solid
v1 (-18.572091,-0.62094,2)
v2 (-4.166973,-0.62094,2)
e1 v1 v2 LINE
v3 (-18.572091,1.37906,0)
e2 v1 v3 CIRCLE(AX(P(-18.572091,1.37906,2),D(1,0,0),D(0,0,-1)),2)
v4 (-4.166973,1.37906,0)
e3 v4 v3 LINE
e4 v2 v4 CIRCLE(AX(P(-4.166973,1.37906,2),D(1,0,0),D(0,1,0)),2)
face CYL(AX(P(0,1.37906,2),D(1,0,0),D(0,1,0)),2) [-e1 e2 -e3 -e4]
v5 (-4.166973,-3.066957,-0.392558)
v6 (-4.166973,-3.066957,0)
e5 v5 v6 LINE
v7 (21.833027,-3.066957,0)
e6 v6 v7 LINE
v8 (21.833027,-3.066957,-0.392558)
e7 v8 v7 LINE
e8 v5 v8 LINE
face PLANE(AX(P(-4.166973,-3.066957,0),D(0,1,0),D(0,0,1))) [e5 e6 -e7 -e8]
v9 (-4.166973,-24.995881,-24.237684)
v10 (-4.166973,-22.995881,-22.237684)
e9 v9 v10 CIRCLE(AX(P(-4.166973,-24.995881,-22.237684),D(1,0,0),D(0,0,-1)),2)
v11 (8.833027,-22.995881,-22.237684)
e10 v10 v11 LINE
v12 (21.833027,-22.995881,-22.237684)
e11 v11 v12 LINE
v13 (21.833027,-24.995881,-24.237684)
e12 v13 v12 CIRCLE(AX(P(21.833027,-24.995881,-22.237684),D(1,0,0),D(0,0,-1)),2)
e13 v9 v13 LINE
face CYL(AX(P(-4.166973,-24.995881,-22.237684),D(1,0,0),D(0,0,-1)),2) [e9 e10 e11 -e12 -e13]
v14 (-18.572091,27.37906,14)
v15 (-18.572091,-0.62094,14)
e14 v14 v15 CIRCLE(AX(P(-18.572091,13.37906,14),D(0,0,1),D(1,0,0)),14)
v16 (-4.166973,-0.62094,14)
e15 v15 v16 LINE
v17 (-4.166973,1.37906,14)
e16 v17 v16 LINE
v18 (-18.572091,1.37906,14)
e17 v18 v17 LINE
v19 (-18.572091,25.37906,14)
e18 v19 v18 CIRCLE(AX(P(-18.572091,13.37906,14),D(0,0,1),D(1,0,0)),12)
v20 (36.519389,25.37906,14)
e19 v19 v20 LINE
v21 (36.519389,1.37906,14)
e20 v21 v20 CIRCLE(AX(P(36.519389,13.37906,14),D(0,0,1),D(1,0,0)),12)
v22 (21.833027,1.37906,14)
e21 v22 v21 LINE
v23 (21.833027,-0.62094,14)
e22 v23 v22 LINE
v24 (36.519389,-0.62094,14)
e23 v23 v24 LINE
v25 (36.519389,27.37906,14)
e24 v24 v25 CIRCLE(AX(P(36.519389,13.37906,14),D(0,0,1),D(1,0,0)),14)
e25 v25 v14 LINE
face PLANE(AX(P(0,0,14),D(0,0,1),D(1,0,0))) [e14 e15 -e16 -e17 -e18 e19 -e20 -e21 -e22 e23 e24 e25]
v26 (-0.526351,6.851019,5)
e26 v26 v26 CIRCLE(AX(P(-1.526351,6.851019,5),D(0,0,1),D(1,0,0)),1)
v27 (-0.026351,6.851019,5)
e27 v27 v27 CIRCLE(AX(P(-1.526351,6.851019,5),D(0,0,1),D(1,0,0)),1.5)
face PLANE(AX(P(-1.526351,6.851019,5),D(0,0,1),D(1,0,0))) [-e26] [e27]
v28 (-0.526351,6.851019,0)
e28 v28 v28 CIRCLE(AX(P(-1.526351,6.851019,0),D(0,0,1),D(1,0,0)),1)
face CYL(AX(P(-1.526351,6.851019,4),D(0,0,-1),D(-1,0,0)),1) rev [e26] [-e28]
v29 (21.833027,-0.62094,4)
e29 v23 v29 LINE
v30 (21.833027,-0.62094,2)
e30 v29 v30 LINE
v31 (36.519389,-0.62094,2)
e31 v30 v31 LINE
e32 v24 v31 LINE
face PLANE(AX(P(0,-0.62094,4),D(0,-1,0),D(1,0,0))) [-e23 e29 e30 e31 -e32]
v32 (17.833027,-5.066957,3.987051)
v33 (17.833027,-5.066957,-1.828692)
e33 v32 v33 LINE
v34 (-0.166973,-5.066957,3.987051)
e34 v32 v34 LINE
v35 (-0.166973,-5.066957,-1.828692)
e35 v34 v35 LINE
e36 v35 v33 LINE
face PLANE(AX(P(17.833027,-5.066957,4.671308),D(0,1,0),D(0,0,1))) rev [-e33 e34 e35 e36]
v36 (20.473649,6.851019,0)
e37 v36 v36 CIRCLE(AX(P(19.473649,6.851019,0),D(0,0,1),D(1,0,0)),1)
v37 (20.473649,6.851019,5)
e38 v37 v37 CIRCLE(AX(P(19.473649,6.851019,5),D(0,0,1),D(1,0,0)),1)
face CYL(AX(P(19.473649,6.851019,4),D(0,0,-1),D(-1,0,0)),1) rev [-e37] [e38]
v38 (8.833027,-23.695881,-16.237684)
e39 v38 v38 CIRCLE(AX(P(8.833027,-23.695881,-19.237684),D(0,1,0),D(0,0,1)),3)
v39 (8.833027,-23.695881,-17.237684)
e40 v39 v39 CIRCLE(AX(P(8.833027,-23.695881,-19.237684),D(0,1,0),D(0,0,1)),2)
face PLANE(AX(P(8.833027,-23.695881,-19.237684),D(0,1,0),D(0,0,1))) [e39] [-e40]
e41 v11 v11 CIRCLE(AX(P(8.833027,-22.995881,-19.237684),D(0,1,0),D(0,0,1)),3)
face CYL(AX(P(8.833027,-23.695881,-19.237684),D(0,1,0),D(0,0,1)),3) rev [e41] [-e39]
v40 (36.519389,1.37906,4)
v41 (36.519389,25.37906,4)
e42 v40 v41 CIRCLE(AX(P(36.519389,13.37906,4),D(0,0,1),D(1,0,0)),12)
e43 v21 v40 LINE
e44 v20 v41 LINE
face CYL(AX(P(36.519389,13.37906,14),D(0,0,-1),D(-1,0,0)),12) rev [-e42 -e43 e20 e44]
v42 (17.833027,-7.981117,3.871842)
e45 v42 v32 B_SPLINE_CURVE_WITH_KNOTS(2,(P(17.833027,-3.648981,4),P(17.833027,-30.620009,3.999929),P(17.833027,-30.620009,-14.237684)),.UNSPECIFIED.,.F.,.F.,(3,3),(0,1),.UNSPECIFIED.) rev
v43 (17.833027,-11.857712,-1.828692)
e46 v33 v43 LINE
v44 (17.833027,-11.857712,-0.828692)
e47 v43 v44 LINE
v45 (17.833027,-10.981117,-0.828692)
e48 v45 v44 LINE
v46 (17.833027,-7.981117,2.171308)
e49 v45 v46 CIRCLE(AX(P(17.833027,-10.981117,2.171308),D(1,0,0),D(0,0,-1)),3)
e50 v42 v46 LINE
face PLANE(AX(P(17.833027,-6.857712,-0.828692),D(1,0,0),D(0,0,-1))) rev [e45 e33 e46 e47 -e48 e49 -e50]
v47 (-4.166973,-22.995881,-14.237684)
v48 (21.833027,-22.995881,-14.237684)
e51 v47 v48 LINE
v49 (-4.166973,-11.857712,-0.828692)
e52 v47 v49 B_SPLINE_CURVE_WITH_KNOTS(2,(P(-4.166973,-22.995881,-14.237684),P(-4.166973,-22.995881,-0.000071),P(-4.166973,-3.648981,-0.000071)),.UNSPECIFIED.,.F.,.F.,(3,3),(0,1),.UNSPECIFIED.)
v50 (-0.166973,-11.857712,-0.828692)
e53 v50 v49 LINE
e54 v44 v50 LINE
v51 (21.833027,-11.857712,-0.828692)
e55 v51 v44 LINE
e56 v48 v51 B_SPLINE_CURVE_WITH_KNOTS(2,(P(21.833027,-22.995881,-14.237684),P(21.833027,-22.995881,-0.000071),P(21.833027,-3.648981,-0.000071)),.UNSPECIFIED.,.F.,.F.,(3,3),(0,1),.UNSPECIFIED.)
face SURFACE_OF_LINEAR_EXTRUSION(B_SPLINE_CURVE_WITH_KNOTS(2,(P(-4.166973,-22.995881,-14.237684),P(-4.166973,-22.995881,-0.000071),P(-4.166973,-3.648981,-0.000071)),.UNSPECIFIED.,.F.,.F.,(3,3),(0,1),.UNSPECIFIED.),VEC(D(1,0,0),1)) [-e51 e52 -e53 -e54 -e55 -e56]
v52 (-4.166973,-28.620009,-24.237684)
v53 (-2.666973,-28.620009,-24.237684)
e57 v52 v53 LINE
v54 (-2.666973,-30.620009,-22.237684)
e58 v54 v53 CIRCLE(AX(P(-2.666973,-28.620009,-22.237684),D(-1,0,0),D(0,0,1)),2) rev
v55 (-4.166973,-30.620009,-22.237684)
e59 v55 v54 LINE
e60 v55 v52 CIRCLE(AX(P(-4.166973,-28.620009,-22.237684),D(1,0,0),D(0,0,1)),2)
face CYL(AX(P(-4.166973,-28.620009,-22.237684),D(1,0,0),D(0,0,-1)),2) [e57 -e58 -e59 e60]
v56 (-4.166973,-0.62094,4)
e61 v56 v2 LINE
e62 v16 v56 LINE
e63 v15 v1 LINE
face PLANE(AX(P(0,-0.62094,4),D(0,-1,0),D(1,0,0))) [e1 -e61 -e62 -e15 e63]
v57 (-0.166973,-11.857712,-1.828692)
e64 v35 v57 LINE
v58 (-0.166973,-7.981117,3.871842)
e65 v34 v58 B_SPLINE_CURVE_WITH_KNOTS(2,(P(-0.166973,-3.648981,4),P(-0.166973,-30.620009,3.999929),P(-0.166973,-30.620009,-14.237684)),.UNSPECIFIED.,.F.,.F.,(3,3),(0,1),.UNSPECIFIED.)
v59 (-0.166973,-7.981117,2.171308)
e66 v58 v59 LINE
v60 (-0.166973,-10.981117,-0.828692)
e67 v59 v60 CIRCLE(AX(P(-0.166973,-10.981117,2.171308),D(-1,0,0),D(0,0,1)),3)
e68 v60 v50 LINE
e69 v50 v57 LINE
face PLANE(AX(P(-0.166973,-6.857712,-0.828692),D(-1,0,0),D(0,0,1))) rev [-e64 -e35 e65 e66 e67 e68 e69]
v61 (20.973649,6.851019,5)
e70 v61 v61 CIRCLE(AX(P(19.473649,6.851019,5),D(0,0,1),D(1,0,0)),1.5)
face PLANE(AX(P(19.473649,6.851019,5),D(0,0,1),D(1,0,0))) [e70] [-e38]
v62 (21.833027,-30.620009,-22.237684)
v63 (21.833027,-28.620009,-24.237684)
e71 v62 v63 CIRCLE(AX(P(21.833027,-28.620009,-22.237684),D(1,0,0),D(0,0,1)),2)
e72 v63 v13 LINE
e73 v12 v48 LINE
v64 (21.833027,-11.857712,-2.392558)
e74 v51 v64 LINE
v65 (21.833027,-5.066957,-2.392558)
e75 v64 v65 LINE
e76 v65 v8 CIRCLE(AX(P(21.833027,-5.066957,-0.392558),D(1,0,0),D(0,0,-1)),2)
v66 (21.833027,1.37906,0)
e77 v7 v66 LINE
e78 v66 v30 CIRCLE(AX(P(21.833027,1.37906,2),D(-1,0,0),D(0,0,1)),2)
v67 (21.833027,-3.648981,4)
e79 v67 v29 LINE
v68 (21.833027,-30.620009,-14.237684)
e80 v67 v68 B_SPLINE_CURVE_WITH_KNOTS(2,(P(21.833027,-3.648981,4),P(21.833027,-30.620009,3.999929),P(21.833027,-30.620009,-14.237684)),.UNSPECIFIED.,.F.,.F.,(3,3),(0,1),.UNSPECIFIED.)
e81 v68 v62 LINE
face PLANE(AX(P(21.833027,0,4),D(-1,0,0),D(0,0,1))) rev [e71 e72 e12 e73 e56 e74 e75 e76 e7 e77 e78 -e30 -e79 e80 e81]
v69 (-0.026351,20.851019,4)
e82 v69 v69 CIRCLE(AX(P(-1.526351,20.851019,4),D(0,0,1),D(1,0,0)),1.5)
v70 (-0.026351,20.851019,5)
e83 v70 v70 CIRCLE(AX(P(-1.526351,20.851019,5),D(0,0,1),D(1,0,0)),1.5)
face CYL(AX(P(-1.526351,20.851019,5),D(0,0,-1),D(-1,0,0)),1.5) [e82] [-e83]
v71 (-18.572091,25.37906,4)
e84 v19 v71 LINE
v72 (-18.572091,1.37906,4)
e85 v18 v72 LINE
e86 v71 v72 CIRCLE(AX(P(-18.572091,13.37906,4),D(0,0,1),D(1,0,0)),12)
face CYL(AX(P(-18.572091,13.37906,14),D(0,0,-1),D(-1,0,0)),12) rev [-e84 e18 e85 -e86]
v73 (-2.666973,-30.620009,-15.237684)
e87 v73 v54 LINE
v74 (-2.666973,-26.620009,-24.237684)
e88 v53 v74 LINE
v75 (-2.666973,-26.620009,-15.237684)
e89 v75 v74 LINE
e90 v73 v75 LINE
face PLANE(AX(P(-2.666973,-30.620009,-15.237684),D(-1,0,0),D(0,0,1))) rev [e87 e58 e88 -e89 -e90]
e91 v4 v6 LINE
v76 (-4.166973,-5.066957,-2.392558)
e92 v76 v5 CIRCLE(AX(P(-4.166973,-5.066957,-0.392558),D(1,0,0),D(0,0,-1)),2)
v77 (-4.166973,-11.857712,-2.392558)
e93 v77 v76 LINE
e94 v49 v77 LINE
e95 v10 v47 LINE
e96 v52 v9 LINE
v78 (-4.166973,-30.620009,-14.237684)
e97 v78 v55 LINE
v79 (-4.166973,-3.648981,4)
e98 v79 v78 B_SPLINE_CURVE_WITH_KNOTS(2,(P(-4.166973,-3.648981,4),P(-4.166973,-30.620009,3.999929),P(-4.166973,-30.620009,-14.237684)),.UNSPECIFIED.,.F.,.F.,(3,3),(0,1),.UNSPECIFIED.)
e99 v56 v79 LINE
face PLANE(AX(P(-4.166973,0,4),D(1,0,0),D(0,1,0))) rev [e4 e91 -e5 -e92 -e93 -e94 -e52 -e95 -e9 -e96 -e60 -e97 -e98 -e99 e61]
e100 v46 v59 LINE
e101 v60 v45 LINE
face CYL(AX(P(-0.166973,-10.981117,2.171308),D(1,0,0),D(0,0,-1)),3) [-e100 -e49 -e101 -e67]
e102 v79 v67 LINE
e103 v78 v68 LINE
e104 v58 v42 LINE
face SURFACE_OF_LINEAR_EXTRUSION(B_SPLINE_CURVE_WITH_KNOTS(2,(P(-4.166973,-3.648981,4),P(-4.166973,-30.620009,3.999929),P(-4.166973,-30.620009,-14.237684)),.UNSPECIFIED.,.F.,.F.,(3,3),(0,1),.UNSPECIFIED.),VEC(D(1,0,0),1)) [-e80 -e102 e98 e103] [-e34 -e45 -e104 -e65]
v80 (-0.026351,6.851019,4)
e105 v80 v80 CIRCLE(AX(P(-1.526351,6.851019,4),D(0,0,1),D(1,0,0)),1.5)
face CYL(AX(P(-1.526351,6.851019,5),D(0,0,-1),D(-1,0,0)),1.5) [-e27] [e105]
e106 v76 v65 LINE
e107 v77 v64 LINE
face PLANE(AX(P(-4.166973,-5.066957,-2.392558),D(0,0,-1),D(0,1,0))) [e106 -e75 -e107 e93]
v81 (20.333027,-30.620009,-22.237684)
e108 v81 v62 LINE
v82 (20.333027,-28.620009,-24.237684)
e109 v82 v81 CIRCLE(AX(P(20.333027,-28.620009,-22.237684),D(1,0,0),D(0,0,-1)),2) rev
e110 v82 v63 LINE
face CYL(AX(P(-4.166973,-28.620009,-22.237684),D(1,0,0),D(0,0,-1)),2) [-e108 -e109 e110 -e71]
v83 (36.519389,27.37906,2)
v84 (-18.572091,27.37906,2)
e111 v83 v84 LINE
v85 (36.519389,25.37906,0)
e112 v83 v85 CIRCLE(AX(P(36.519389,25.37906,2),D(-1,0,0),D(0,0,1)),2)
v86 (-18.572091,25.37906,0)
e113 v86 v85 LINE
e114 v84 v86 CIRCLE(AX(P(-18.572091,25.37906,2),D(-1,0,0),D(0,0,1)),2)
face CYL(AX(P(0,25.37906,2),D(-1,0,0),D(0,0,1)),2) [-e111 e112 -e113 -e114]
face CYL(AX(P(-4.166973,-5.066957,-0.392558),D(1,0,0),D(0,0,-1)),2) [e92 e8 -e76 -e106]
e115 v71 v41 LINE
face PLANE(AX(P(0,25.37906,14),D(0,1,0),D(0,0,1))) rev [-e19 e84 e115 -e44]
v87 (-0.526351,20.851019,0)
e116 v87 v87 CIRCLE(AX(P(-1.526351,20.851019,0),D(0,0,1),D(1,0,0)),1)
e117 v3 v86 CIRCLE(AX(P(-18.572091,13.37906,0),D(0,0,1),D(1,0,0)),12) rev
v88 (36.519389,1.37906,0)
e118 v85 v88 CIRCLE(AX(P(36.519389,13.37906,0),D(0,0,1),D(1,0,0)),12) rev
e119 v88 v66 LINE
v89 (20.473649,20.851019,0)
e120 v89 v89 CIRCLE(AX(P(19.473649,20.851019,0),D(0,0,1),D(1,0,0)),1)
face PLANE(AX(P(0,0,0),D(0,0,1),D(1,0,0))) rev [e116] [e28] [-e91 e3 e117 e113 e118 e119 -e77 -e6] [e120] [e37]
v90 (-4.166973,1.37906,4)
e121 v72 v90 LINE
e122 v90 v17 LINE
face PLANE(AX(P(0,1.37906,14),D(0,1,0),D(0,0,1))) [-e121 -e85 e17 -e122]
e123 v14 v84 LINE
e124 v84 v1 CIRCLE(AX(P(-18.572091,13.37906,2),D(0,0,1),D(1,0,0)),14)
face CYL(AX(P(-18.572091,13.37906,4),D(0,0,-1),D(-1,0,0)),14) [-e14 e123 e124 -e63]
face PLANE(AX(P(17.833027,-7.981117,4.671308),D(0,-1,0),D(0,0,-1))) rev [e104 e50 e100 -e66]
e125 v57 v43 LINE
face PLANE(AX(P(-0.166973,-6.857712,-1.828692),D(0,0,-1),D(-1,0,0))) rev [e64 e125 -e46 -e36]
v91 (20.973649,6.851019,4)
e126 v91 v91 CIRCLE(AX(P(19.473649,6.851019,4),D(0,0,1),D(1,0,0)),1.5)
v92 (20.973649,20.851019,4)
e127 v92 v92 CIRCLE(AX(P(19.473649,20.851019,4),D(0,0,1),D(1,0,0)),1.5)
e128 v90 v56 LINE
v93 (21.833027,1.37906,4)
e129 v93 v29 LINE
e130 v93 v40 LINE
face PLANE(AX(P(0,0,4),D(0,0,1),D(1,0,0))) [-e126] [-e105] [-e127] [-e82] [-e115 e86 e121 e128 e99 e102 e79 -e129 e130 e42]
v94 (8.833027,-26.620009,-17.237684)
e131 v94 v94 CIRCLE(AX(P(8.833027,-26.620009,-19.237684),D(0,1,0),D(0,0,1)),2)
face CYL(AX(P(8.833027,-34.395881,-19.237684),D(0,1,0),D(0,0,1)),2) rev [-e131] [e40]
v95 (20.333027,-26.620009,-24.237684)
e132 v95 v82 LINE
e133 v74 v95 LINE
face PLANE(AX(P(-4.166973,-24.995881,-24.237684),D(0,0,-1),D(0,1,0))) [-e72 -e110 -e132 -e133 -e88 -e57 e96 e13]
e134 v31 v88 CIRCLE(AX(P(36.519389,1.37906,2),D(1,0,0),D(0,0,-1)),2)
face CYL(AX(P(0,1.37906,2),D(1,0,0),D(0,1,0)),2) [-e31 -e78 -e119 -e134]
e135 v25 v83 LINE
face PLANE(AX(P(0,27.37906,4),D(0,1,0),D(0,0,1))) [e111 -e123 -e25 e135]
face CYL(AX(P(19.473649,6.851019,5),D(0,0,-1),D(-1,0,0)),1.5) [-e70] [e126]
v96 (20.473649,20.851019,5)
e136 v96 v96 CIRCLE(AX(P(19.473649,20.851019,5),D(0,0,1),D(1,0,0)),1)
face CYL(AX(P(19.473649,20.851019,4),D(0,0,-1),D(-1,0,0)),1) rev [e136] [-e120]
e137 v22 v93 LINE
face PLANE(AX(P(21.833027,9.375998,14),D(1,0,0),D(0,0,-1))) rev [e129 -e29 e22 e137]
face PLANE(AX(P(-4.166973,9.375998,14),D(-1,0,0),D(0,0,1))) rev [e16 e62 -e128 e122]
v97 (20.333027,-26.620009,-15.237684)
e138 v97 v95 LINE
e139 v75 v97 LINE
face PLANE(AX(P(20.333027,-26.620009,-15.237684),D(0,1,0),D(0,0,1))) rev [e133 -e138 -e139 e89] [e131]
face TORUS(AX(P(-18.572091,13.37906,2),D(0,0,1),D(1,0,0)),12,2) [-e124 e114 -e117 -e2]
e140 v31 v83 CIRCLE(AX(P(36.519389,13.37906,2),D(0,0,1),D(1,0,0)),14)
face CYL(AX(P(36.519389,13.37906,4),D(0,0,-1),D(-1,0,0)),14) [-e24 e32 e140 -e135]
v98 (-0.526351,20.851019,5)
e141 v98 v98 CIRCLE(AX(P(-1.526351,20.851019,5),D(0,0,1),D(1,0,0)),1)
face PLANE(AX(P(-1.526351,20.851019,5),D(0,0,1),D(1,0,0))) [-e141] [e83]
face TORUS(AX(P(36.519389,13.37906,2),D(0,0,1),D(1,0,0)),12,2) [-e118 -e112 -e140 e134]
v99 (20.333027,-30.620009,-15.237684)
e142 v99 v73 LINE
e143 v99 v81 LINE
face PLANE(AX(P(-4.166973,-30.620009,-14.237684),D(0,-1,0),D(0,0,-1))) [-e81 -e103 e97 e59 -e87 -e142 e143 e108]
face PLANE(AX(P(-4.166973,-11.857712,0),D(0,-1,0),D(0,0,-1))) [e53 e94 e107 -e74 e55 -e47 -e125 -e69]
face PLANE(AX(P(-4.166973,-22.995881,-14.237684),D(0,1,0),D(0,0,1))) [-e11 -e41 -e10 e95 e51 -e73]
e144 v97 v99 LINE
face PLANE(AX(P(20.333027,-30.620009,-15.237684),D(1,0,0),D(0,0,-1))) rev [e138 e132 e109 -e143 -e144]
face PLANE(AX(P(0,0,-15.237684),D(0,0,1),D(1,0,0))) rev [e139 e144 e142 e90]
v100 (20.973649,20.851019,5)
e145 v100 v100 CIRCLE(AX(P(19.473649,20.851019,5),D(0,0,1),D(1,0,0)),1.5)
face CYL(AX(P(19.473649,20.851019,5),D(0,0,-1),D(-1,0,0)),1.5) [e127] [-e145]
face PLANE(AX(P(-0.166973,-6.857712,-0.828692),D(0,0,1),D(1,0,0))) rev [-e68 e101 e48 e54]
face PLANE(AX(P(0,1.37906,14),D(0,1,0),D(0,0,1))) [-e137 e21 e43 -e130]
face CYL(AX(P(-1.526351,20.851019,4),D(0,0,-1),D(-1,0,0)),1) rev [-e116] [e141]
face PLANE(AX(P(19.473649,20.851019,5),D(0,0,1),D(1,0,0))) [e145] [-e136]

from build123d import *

# Parameters (mm, degrees)
SKETCH1_R                = 1
BOSS_EXTRUDE2_DEPTH      = 4
BOSS_EXTRUDE3_DEPTH      = 10
SKETCH3_W                = 26
SKETCH3_H                = 10
CUT_EXTRUDE1_DEPTH       = 10
BOSS_EXTRUDE4_DEPTH      = 26
SKETCH8_W                = 23
SKETCH8_H                = 4
CUT_EXTRUDE5_DEPTH       = 9
SKETCH10_R               = 3
CUT_EXTRUDE7_DEPTH       = 0.7
SKETCH11_R               = 2
CUT_EXTRUDE8_DEPTH       = 10.7
BOSS_EXTRUDE5_START      = -26
BOSS_EXTRUDE5_DEPTH      = 26
SKETCH14_W               = 18
SKETCH14_H               = 1
CUT_EXTRUDE10_DEPTH      = 5
CUT_EXTRUDE11_DEPTH      = 1
CUT_EXTRUDE11_DEPTH_BACK = 5.5
SKETCH15_W               = 18
SKETCH15_H               = 2.914160071
SKETCH16_R               = 1.5
SKETCH16_R_2             = 1
BOSS_EXTRUDE6_DEPTH      = 1
FILLET3_R                = 2
FILLET4_R                = 3


# Read off the part's stored shape, not the designer's step: Boss-Extrude5
with BuildPart() as part:
    # Sketch1 → Boss-Extrude2 (new body)
    with BuildSketch(Plane.XY):
        with BuildLine():
            Line((-18.57209146, 27.379059863), (36.519389128, 27.379059863))
            ThreePointArc((36.519389128, 27.379059863), (50.519389128, 13.379059863), (36.519389128, -0.620940137))
            Line((36.519389128, -0.620940137), (21.833027405, -0.620940137))
            Line((21.833027405, -0.620940137), (21.833027405, -3.648981121))
            Line((21.833027405, -3.648981121), (-4.166972595, -3.648981121))
            Line((-4.166972595, -3.648981121), (-4.166972595, -0.620940137))
            Line((-4.166972595, -0.620940137), (-18.57209146, -0.620940137))
            ThreePointArc((-18.57209146, -0.620940137), (-32.57209146, 13.379059863), (-18.57209146, 27.379059863))
        make_face()
        with Locations((-1.526351166, 20.851018883)):
            Circle(SKETCH1_R, mode=Mode.SUBTRACT)
        with Locations((19.473648834, 20.851018883)):
            Circle(SKETCH1_R, mode=Mode.SUBTRACT)
        with Locations((-1.526351166, 6.851018883)):
            Circle(SKETCH1_R, mode=Mode.SUBTRACT)
        with Locations((19.473648834, 6.851018883)):
            Circle(SKETCH1_R, mode=Mode.SUBTRACT)
    extrude(amount=BOSS_EXTRUDE2_DEPTH)

    # Sketch2 → Boss-Extrude3 (add)
    with BuildSketch(Plane.XY.offset(4)):
        with BuildLine():
            Line((-4.166972595, -0.620940137), (-4.166972595, -0.624002345))
            Line((-4.166972595, -0.624002345), (21.833027405, -0.624002345))
            Line((21.833027405, -0.624002345), (21.833027405, -0.620940137))
            Line((21.833027405, -0.620940137), (36.519389128, -0.620940137))
            ThreePointArc((36.519389128, -0.620940137), (50.519389128, 13.379059863), (36.519389128, 27.379059863))
            Line((36.519389128, 27.379059863), (-18.57209146, 27.379059863))
            ThreePointArc((-18.57209146, 27.379059863), (-32.57209146, 13.379059863), (-18.57209146, -0.620940137))
            Line((-18.57209146, -0.620940137), (-4.166972595, -0.620940137))
        make_face()
        with BuildLine():
            ThreePointArc((-18.57209146, 1.379059863), (-30.57209146, 13.379059863), (-18.57209146, 25.379059863))
            Line((-18.57209146, 25.379059863), (36.519389128, 25.379059863))
            ThreePointArc((36.519389128, 25.379059863), (48.519389128, 13.379059863), (36.519389128, 1.379059863))
            Line((36.519389128, 1.379059863), (-18.57209146, 1.379059863))
        make_face(mode=Mode.SUBTRACT)
    extrude(amount=BOSS_EXTRUDE3_DEPTH)

    # Sketch3 → Cut-Extrude1 (cut)
    with BuildSketch(Plane.XZ.offset(0.624002345)):
        with Locations((8.833027405, 9)):
            Rectangle(SKETCH3_W, SKETCH3_H)
    extrude(amount=-CUT_EXTRUDE1_DEPTH, mode=Mode.SUBTRACT)

    # Sketch4 → Boss-Extrude4 (add)
    with BuildSketch(Plane(origin=(21.833027405, 0, 0), x_dir=(0, 0, -1), z_dir=(1, 0, 0))):
        with BuildLine():
            Line((-4, -3.648981121), (7.0957e-05, -3.648981121))
            add(Edge.make_bspline(
                [(7.0957e-05, -3.648981121), (7.0957e-05, -22.995880537), (14.23768392, -22.995880537)],
                knots=[0, 0, 0, 1, 1, 1], degree=2))
            Line((14.23768392, -22.995880537), (22.23768392, -22.995880537))
            ThreePointArc((22.23768392, -22.995880537), (23.651897483, -23.581666974), (24.23768392, -24.995880537))
            Line((24.23768392, -24.995880537), (24.23768392, -28.620008298))
            ThreePointArc((24.23768392, -28.620008298), (23.651897483, -30.034221861), (22.23768392, -30.620008298))
            Line((22.23768392, -30.620008298), (14.23768392, -30.620008298))
            add(Edge.make_bspline(
                [(-4, -3.648981121), (-3.999929043, -30.620008298), (14.23768392, -30.620008298)],
                knots=[0, 0, 0, 1, 1, 1], degree=2))
        make_face()
    extrude(amount=-BOSS_EXTRUDE4_DEPTH)

    # Sketch8 → Cut-Extrude5 (cut)
    with BuildSketch(Plane(origin=(0, 0, -24.237684184), x_dir=(-1, 0, 0), z_dir=(0, 0, -1))):
        with Locations((-8.833027405, -28.620008644)):
            Rectangle(SKETCH8_W, SKETCH8_H)
    extrude(amount=-CUT_EXTRUDE5_DEPTH, mode=Mode.SUBTRACT)

    # Sketch10 → Cut-Extrude7 (cut)
    with BuildSketch(Plane(origin=(0, -22.995880711, 0), x_dir=(1, 0, 0), z_dir=(0, 1, 0))):
        with Locations(Location((8.833027405, 19.237684184, 0), (0, 0, 270))):
            Circle(SKETCH10_R)
    extrude(amount=-CUT_EXTRUDE7_DEPTH, mode=Mode.SUBTRACT)

    # Sketch11 → Cut-Extrude8 (cut)
    with BuildSketch(Plane(origin=(0, -23.695880711, 0), x_dir=(1, 0, 0), z_dir=(0, 1, 0))):
        with Locations(Location((8.833027405, 19.23768392, 0), (0, 0, 270))):
            Circle(SKETCH11_R)
    extrude(amount=-CUT_EXTRUDE8_DEPTH, mode=Mode.SUBTRACT)

    # Boss-Extrude5 outline → Boss-Extrude5 (add)
    with BuildSketch(Plane(origin=(21.833027405, 0, 0), x_dir=(0, 0, -1), z_dir=(1, 0, 0)).offset(BOSS_EXTRUDE5_START)):
        with BuildLine():
            ThreePointArc((2.392558217, -5.066956781), (1.80677178, -3.652743218), (0.392558217, -3.066956781))
            Line((0.392558217, -3.066956781), (-1, -3.066956781))
            Line((-1, -3.066956781), (-1, -3.648981121))
            Line((-1, -3.648981121), (7.0828e-05, -3.648981121))
            add(Edge.make_bspline(
                [(0.828692106, -11.857711885), (7.0827e-05, -8.316335967), (7.0828e-05, -3.648981121)],
                knots=[0.758754376, 0.758754376, 0.758754376, 1, 1, 1], degree=2))
            Line((0.828692106, -11.857711885), (2.392558217, -11.857711885))
            Line((2.392558217, -11.857711885), (2.392558217, -5.066956781))
        make_face()
    extrude(amount=BOSS_EXTRUDE5_DEPTH)

    # Sketch14 → Cut-Extrude10 (cut)
    with BuildSketch(Plane.XZ.offset(11.857711885)):
        with Locations((8.833027405, -1.328692104)):
            Rectangle(SKETCH14_W, SKETCH14_H)
    extrude(amount=-CUT_EXTRUDE10_DEPTH, mode=Mode.SUBTRACT)

    # Sketch15 → Cut-Extrude11 (cut, two sides: drawn at the far end of the back side and taken through both)
    with BuildSketch(Plane(origin=(0, 0, -0.828692104), x_dir=(-1, 0, 0), z_dir=(0, 0, -1)).offset(-CUT_EXTRUDE11_DEPTH_BACK)):
        with Locations((-8.833027405, -6.524036817)):
            Rectangle(SKETCH15_W, SKETCH15_H)
    extrude(amount=CUT_EXTRUDE11_DEPTH + CUT_EXTRUDE11_DEPTH_BACK, mode=Mode.SUBTRACT)

    # Sketch16 → Boss-Extrude6 (add)
    # profile 1 of 4: a face of its own
    with BuildSketch(Plane.XY.offset(4)):
        with Locations((-1.526351166, 20.851018883)):
            Circle(SKETCH16_R)
        with Locations((-1.526351166, 20.851018883)):
            Circle(SKETCH16_R_2, mode=Mode.SUBTRACT)
    # profile 2 of 4: a face of its own
    with BuildSketch(Plane.XY.offset(4)):
        with Locations((-1.526351166, 6.851018883)):
            Circle(SKETCH16_R)
        with Locations((-1.526351166, 6.851018883)):
            Circle(SKETCH16_R_2, mode=Mode.SUBTRACT)
    # profile 3 of 4: a face of its own
    with BuildSketch(Plane.XY.offset(4)):
        with Locations((19.473648834, 20.851018883)):
            Circle(SKETCH16_R)
        with Locations((19.473648834, 20.851018883)):
            Circle(SKETCH16_R_2, mode=Mode.SUBTRACT)
    # profile 4 of 4: a face of its own
    with BuildSketch(Plane.XY.offset(4)):
        with Locations((19.473648834, 6.851018883)):
            Circle(SKETCH16_R)
        with Locations((19.473648834, 6.851018883)):
            Circle(SKETCH16_R_2, mode=Mode.SUBTRACT)
    extrude(amount=BOSS_EXTRUDE6_DEPTH)

    # Fillet3
    fillet3_edges = [part.edges().sort_by_distance(p)[0] for p in [
        (50.519389128, 13.379059863, 0),
        (29.176208267, -0.620940137, 0),
        (-11.369532027, -0.620940137, 0),
        (-32.57209146, 13.379059863, 0),
        (8.973648834, 27.379059863, 0),
    ]]
    fillet(fillet3_edges, radius=FILLET3_R)

    # Fillet4
    fillet4_edges = [part.edges().sort_by_distance(p)[0] for p in [
        (8.833027405, -7.981116852, -0.828692104),
    ]]
    fillet(fillet4_edges, radius=FILLET4_R)


solid = part.part
